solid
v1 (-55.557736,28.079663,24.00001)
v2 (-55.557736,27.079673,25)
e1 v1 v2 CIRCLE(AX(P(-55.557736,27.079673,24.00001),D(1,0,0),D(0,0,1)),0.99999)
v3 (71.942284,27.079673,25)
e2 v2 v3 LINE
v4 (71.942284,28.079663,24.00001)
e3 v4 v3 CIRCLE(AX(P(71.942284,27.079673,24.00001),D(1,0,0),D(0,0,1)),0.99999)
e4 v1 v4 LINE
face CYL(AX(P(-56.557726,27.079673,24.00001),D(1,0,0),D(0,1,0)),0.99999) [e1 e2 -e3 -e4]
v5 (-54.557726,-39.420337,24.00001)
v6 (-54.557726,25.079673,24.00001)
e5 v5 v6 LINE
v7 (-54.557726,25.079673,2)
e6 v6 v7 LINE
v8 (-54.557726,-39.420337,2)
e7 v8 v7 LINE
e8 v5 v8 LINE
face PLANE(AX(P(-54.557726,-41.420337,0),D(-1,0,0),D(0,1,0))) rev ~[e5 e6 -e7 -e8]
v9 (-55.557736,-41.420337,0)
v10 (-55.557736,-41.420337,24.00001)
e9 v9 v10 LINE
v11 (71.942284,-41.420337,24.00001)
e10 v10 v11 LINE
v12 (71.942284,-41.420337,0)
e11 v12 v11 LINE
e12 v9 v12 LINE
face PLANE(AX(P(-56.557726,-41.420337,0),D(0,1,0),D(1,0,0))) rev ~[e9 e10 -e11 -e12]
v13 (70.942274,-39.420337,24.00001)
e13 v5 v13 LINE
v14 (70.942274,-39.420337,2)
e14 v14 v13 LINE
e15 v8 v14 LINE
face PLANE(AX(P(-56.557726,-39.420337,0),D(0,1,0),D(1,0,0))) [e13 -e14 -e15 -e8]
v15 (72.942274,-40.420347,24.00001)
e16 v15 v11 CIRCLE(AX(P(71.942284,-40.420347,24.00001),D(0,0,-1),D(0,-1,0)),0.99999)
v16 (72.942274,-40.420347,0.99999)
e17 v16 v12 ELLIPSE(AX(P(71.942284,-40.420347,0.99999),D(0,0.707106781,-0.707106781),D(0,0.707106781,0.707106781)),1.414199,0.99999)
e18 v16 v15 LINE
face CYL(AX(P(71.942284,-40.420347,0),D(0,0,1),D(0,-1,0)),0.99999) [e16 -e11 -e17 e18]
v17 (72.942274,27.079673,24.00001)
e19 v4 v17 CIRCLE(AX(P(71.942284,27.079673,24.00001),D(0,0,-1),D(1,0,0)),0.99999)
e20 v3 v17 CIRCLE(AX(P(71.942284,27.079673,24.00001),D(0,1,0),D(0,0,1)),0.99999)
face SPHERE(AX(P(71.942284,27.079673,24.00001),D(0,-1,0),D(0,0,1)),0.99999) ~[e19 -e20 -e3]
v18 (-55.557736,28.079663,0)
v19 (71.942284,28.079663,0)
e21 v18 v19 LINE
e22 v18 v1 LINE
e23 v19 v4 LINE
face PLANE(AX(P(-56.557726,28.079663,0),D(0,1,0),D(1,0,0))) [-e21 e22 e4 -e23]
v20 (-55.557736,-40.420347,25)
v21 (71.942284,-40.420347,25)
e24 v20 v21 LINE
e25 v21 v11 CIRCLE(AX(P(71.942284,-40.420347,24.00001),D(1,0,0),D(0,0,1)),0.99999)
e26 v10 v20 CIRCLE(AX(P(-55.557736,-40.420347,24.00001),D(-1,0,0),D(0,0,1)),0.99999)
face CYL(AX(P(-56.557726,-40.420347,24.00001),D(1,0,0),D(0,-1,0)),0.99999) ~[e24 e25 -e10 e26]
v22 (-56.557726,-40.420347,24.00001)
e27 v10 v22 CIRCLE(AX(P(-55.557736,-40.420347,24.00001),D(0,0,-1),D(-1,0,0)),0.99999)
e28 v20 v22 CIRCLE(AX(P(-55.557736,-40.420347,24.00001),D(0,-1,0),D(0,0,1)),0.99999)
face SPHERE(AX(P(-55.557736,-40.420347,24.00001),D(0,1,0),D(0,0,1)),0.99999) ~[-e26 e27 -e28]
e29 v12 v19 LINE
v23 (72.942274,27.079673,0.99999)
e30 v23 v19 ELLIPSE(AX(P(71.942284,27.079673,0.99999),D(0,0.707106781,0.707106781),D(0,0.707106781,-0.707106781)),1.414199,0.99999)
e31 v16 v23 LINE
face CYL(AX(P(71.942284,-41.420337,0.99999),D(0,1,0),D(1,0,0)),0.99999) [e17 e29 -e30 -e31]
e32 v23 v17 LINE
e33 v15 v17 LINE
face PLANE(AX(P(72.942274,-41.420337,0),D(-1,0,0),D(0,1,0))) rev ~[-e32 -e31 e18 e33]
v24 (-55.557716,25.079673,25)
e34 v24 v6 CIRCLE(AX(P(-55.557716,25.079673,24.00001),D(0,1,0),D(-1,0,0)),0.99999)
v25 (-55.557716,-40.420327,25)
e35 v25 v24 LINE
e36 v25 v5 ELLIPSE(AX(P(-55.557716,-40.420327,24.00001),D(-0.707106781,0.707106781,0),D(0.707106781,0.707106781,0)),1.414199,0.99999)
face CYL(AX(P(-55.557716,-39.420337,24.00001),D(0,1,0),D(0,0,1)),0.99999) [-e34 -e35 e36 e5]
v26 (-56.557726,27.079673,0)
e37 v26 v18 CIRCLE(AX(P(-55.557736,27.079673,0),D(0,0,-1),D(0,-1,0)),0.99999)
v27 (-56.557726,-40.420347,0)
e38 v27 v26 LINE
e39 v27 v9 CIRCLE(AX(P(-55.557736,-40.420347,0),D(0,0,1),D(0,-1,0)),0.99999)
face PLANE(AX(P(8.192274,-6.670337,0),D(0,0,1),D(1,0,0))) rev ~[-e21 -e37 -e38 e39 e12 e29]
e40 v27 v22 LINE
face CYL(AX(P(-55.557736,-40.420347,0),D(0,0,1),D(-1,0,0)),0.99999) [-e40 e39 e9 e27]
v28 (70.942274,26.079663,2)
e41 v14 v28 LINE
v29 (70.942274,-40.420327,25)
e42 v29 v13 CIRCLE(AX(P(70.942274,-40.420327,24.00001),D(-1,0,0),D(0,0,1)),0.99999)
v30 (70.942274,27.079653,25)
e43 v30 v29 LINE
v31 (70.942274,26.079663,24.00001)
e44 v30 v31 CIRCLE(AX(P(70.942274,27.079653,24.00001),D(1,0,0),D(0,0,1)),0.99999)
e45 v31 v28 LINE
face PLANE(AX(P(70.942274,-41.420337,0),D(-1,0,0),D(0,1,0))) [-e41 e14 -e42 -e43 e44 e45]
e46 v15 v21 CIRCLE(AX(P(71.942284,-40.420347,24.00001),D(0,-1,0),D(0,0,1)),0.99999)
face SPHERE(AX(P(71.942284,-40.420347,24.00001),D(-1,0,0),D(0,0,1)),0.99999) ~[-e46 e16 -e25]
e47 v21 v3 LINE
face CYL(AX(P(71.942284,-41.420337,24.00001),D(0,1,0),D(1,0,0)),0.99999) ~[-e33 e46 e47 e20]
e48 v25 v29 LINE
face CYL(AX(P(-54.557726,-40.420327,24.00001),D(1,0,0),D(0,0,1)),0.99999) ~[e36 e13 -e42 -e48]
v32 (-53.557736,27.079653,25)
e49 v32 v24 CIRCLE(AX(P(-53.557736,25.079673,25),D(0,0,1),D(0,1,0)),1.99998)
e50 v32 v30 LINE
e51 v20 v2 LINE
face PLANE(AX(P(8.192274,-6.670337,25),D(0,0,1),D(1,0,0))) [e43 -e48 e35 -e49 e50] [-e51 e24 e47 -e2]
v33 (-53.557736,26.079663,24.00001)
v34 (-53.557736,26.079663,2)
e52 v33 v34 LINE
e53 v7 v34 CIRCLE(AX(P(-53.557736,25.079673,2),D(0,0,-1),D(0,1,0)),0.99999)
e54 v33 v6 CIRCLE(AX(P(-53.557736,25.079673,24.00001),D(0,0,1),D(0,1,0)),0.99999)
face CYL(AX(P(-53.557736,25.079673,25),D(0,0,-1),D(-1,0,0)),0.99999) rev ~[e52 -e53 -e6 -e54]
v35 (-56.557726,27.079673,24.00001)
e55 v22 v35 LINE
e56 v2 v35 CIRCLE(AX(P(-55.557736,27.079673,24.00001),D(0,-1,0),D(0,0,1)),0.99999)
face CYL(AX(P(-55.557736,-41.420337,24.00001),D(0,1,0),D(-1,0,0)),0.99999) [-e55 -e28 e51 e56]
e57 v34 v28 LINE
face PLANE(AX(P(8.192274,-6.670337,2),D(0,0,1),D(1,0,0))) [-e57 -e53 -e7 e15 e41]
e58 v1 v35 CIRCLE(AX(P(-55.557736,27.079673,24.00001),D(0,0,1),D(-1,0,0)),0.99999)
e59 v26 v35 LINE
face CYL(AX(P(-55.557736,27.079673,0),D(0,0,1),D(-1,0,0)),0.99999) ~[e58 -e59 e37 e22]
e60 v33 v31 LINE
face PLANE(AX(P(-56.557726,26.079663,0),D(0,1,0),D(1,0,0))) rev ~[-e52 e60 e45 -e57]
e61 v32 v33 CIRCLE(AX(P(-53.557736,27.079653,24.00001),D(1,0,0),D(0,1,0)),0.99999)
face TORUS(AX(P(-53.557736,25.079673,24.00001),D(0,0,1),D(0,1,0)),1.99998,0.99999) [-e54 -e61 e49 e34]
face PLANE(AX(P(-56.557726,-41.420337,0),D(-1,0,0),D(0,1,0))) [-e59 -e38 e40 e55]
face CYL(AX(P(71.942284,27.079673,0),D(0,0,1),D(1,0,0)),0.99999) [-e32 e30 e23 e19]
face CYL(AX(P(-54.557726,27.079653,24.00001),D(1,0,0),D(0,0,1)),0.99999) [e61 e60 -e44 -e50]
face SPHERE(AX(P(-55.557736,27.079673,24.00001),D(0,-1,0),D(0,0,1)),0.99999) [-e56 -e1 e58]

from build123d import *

# Parameters (mm, degrees)
F0_W     = 129.5
F0_H     = 69.5
F1_DEPTH = 25
F2_T     = -2
F3_R     = 0.99999


# Not quite as in the source:
# - a fillet or chamfer is up to 0.001 mm smaller than in the source, because OpenCascade refuses the exact size


with BuildPart() as f1:
    # F0 (on Top) → F1 (new body)
    with BuildSketch(Plane.XY):
        with Locations((8.1922735609, -6.6703366488)):
            Rectangle(F0_W, F0_H)
    extrude(amount=F1_DEPTH)

    # F2
    f2_openings = [f1.faces().sort_by_distance(p)[0] for p in [
        (8.192274, -6.670337, 25),
    ]]
    offset(amount=F2_T, openings=f2_openings)

    # F3 (radius 1 in the source; OpenCascade refuses exactly that, so slightly less here)
    f3_edges = [f1.edges().sort_by_distance(p)[0] for p in [
        (8.192274, 26.079663, 25),
        (-56.557726, -6.670337, 25),
        (-54.557726, -6.670337, 25),
        (8.192274, -41.420337, 25),
        (72.942274, -6.670337, 0),
        (72.942274, -6.670337, 25),
        (8.192274, -39.420337, 25),
        (8.192274, 28.079663, 25),
        (72.942274, 28.079663, 12.5),
        (-56.557726, 28.079663, 12.5),
        (-56.557726, -41.420337, 12.5),
        (-54.557726, 26.079663, 13.5),
        (72.942274, -41.420337, 12.5),
    ]]
    fillet(f3_edges, radius=F3_R)


solid = f1.part
